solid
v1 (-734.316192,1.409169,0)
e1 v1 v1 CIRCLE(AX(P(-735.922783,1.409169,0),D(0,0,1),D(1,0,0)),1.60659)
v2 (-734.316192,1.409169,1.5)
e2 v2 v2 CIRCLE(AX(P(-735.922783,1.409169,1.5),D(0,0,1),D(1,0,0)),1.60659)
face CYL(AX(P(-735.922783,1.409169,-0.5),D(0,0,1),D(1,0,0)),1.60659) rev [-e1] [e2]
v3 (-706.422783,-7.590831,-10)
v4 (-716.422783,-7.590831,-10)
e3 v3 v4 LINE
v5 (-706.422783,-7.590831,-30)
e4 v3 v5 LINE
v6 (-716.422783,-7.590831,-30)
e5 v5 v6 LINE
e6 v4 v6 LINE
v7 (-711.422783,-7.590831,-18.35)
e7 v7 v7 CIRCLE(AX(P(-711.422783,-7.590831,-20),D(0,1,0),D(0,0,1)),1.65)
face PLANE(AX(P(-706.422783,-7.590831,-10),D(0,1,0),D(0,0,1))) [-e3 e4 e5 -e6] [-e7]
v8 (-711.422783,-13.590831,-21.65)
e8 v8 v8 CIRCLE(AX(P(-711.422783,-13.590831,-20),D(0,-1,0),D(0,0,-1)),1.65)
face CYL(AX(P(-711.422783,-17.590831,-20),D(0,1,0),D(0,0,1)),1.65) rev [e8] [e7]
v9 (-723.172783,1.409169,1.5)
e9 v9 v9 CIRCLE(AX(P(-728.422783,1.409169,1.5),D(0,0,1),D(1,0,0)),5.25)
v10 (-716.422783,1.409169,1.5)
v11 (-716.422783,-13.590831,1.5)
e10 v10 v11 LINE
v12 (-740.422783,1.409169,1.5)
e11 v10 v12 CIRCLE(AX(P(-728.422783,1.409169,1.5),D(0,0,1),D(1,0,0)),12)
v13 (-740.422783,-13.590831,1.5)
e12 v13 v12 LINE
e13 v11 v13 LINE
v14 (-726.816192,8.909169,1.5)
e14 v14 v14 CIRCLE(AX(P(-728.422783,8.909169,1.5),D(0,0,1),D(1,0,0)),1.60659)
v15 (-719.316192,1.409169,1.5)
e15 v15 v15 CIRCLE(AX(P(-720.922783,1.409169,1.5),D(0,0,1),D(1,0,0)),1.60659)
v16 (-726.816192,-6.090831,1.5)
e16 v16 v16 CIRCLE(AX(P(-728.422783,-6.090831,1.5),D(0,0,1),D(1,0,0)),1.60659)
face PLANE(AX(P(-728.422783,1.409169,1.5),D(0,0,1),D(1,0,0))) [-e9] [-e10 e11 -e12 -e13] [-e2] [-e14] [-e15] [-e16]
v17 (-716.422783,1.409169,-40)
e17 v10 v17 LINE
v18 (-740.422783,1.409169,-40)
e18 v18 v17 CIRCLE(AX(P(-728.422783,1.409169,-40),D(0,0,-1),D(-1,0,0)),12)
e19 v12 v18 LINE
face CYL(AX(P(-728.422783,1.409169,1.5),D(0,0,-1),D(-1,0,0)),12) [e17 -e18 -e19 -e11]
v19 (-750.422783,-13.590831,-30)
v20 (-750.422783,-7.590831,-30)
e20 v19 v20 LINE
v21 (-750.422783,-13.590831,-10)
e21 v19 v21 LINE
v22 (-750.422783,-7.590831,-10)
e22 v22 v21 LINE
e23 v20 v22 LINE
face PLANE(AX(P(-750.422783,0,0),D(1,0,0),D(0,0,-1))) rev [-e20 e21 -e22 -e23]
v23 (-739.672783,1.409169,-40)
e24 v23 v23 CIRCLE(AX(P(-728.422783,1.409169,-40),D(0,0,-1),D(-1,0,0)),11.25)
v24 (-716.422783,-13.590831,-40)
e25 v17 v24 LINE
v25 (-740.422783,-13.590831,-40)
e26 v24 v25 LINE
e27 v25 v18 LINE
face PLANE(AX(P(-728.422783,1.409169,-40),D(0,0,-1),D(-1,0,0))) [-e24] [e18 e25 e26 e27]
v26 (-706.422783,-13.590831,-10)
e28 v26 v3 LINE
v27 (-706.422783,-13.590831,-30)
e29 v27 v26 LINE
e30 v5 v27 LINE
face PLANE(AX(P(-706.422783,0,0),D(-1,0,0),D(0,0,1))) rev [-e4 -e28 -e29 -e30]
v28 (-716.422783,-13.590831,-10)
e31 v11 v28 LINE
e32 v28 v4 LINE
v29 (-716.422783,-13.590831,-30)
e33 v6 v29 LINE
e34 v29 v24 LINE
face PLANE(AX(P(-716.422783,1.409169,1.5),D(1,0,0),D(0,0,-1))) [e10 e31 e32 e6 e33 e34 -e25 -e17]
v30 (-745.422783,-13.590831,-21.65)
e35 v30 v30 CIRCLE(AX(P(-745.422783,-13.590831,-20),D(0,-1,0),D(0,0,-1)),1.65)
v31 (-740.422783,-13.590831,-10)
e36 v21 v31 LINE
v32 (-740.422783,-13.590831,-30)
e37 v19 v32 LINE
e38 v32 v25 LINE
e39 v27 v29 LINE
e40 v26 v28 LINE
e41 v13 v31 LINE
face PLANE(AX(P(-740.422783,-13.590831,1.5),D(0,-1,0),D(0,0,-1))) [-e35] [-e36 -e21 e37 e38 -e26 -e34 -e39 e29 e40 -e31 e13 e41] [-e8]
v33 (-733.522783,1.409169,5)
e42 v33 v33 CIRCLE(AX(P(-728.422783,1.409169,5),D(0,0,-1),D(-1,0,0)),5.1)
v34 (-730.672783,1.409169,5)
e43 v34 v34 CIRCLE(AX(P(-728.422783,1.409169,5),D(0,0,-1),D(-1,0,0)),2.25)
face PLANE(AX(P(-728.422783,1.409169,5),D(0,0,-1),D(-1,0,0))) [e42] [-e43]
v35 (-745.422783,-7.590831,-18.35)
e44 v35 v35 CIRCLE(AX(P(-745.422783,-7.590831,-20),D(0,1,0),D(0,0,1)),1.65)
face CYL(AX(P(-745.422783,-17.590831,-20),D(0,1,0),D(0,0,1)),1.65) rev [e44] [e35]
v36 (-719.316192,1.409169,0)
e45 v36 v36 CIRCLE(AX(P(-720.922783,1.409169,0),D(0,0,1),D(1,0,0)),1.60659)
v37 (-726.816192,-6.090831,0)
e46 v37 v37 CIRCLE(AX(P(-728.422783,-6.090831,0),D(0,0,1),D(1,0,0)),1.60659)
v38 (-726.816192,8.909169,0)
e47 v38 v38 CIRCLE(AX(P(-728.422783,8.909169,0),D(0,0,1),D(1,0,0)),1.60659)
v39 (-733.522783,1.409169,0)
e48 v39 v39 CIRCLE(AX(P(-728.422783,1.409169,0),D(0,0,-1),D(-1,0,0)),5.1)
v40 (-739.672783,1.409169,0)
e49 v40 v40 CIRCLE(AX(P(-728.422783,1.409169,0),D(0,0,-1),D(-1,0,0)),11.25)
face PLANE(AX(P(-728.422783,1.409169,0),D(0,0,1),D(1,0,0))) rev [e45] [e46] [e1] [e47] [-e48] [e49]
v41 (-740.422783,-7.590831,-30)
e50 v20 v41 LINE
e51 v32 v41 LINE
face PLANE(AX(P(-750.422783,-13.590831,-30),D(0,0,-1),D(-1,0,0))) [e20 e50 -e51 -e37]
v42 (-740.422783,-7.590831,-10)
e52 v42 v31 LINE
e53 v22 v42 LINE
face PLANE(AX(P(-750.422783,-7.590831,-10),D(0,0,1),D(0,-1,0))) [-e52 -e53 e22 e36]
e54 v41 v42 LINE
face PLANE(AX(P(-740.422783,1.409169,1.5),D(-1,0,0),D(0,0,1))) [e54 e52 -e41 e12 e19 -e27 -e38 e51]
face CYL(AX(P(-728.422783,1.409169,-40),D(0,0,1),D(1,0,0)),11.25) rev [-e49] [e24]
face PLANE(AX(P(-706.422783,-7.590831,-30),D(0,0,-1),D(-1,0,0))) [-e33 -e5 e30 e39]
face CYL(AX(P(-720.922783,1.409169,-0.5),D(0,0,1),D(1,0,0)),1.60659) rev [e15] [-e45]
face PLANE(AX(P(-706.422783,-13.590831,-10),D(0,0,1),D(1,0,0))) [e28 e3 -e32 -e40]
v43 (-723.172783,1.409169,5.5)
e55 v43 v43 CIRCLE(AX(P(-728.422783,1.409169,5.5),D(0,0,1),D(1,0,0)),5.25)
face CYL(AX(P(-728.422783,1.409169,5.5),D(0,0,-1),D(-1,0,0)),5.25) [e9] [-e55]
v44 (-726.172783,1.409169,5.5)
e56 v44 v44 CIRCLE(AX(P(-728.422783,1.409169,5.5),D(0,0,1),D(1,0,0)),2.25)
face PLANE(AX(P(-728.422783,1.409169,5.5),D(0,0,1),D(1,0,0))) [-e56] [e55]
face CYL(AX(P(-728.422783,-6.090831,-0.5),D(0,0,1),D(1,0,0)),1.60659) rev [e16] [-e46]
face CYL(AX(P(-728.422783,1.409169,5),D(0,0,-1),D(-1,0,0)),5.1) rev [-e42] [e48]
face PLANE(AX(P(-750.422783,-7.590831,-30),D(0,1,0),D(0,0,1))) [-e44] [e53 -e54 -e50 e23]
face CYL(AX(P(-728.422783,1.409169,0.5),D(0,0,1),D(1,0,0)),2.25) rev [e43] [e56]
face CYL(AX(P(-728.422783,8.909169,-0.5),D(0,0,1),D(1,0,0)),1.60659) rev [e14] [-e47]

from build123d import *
from build123d.topology import SkipClean

# Parameters (mm, degrees)
CROQUIS1_R              = 12
SALIENTE_EXTRUIR1_DEPTH = 1.5
CROQUIS2_R              = 1.606590309
CORTAR_EXTRUIR1_DEPTH   = 2
CROQUIS3_R              = 5.25
SALIENTE_EXTRUIR2_DEPTH = 4
CROQUIS4_R              = 5.1
CORTAR_EXTRUIR2_DEPTH   = 5
CROQUIS5_R              = 2.25
CORTAR_EXTRUIR3_DEPTH   = 5
SALIENTE_EXTRUIR3_START = 40
CROQUIS7_R              = 12
CROQUIS7_R_2            = 11.25
SALIENTE_EXTRUIR3_DEPTH = 40
SALIENTE_EXTRUIR4_DEPTH = 41.5
CROQUIS9_W              = 20
CROQUIS9_H              = 6
SALIENTE_EXTRUIR5_DEPTH = 10
CROQUIS10_W             = 20
CROQUIS10_H             = 6
SALIENTE_EXTRUIR6_DEPTH = 10
CROQUIS11_R             = 1.65
CORTAR_EXTRUIR4_DEPTH   = 10


with BuildPart() as part:
    # Croquis1 → Saliente-Extruir1 (new body)
    with BuildSketch(Plane.XY):
        with Locations((-728.422782565, 1.40916901)):
            Circle(CROQUIS1_R)
    extrude(amount=SALIENTE_EXTRUIR1_DEPTH)

    # Croquis2 → Cortar-Extruir1 (cut)
    with BuildSketch(Plane.XY.offset(1.5)):
        with Locations((-728.422782565, 8.90916901)):
            Circle(CROQUIS2_R)
        with Locations((-720.922782565, 1.40916901)):
            Circle(CROQUIS2_R)
        with Locations((-728.422782565, -6.09083099)):
            Circle(CROQUIS2_R)
        with Locations((-735.922782565, 1.40916901)):
            Circle(CROQUIS2_R)
    extrude(amount=-CORTAR_EXTRUIR1_DEPTH, mode=Mode.SUBTRACT)

    # Croquis3 → Saliente-Extruir2 (add)
    with BuildSketch(Plane.XY.offset(1.5)):
        with Locations((-728.422782565, 1.40916901)):
            Circle(CROQUIS3_R)
    extrude(amount=SALIENTE_EXTRUIR2_DEPTH)

    # Croquis4 → Cortar-Extruir2 (cut)
    with BuildSketch(Plane(origin=(0, 0, 0), x_dir=(-1, 0, 0), z_dir=(0, 0, -1))):
        with Locations((728.422782565, 1.40916901)):
            Circle(CROQUIS4_R)
    extrude(amount=-CORTAR_EXTRUIR2_DEPTH, mode=Mode.SUBTRACT)

    # Croquis5 → Cortar-Extruir3 (cut)
    with BuildSketch(Plane.XY.offset(5.5)):
        with Locations((-728.422782565, 1.40916901)):
            Circle(CROQUIS5_R)
    extrude(amount=-CORTAR_EXTRUIR3_DEPTH, mode=Mode.SUBTRACT)

    # Croquis7 → Saliente-Extruir3 (add)
    with BuildSketch(Plane(origin=(0, 0, 0), x_dir=(-1, 0, 0), z_dir=(0, 0, -1)).offset(SALIENTE_EXTRUIR3_START)):
        with Locations((728.422782565, 1.40916901)):
            Circle(CROQUIS7_R)
        with Locations((728.422782565, 1.40916901)):
            Circle(CROQUIS7_R_2, mode=Mode.SUBTRACT)
    extrude(amount=-SALIENTE_EXTRUIR3_DEPTH)

    # Croquis8 → Saliente-Extruir4 (add)
    with SkipClean():  # the faces are left unmerged after this step: merging them gives an invalid solid
        with BuildSketch(Plane(origin=(0, 0, -40), x_dir=(-1, 0, 0), z_dir=(0, 0, -1))):
            with BuildLine():
                Line((716.422782565, 1.40916901), (716.422782565, -13.59083099))
                Line((716.422782565, -13.59083099), (728.422782565, -13.59083099))
                Line((728.422782565, -13.59083099), (740.422782565, -13.59083099))
                Line((740.422782565, -13.59083099), (740.422782565, 1.40916901))
                ThreePointArc((740.422782565, 1.40916901), (728.422782565, -10.59083099), (716.422782565, 1.40916901))
            make_face()
        extrude(amount=-SALIENTE_EXTRUIR4_DEPTH)
    add(part.part.scale(1), mode=Mode.REPLACE)  # the faces are merged on a copy

    # Croquis9 → Saliente-Extruir5 (add)
    with BuildSketch(Plane.ZY.offset(740.422782565)):
        with Locations((-20, -10.59083099)):
            Rectangle(CROQUIS9_W, CROQUIS9_H)
    extrude(amount=SALIENTE_EXTRUIR5_DEPTH)

    # Croquis10 → Saliente-Extruir6 (add)
    with BuildSketch(Plane(origin=(-716.422782565, 0, 0), x_dir=(0, 0, -1), z_dir=(1, 0, 0))):
        with Locations((20, -10.59083099)):
            Rectangle(CROQUIS10_W, CROQUIS10_H)
    extrude(amount=SALIENTE_EXTRUIR6_DEPTH)

    # Croquis11 → Cortar-Extruir4 (cut)
    with BuildSketch(Plane(origin=(0, -7.59083099, 0), x_dir=(1, 0, 0), z_dir=(0, 1, 0))):
        with Locations((-745.422782565, 20)):
            Circle(CROQUIS11_R)
        with Locations((-711.422782565, 20)):
            Circle(CROQUIS11_R)
    extrude(amount=-CORTAR_EXTRUIR4_DEPTH, mode=Mode.SUBTRACT)


solid = part.part
